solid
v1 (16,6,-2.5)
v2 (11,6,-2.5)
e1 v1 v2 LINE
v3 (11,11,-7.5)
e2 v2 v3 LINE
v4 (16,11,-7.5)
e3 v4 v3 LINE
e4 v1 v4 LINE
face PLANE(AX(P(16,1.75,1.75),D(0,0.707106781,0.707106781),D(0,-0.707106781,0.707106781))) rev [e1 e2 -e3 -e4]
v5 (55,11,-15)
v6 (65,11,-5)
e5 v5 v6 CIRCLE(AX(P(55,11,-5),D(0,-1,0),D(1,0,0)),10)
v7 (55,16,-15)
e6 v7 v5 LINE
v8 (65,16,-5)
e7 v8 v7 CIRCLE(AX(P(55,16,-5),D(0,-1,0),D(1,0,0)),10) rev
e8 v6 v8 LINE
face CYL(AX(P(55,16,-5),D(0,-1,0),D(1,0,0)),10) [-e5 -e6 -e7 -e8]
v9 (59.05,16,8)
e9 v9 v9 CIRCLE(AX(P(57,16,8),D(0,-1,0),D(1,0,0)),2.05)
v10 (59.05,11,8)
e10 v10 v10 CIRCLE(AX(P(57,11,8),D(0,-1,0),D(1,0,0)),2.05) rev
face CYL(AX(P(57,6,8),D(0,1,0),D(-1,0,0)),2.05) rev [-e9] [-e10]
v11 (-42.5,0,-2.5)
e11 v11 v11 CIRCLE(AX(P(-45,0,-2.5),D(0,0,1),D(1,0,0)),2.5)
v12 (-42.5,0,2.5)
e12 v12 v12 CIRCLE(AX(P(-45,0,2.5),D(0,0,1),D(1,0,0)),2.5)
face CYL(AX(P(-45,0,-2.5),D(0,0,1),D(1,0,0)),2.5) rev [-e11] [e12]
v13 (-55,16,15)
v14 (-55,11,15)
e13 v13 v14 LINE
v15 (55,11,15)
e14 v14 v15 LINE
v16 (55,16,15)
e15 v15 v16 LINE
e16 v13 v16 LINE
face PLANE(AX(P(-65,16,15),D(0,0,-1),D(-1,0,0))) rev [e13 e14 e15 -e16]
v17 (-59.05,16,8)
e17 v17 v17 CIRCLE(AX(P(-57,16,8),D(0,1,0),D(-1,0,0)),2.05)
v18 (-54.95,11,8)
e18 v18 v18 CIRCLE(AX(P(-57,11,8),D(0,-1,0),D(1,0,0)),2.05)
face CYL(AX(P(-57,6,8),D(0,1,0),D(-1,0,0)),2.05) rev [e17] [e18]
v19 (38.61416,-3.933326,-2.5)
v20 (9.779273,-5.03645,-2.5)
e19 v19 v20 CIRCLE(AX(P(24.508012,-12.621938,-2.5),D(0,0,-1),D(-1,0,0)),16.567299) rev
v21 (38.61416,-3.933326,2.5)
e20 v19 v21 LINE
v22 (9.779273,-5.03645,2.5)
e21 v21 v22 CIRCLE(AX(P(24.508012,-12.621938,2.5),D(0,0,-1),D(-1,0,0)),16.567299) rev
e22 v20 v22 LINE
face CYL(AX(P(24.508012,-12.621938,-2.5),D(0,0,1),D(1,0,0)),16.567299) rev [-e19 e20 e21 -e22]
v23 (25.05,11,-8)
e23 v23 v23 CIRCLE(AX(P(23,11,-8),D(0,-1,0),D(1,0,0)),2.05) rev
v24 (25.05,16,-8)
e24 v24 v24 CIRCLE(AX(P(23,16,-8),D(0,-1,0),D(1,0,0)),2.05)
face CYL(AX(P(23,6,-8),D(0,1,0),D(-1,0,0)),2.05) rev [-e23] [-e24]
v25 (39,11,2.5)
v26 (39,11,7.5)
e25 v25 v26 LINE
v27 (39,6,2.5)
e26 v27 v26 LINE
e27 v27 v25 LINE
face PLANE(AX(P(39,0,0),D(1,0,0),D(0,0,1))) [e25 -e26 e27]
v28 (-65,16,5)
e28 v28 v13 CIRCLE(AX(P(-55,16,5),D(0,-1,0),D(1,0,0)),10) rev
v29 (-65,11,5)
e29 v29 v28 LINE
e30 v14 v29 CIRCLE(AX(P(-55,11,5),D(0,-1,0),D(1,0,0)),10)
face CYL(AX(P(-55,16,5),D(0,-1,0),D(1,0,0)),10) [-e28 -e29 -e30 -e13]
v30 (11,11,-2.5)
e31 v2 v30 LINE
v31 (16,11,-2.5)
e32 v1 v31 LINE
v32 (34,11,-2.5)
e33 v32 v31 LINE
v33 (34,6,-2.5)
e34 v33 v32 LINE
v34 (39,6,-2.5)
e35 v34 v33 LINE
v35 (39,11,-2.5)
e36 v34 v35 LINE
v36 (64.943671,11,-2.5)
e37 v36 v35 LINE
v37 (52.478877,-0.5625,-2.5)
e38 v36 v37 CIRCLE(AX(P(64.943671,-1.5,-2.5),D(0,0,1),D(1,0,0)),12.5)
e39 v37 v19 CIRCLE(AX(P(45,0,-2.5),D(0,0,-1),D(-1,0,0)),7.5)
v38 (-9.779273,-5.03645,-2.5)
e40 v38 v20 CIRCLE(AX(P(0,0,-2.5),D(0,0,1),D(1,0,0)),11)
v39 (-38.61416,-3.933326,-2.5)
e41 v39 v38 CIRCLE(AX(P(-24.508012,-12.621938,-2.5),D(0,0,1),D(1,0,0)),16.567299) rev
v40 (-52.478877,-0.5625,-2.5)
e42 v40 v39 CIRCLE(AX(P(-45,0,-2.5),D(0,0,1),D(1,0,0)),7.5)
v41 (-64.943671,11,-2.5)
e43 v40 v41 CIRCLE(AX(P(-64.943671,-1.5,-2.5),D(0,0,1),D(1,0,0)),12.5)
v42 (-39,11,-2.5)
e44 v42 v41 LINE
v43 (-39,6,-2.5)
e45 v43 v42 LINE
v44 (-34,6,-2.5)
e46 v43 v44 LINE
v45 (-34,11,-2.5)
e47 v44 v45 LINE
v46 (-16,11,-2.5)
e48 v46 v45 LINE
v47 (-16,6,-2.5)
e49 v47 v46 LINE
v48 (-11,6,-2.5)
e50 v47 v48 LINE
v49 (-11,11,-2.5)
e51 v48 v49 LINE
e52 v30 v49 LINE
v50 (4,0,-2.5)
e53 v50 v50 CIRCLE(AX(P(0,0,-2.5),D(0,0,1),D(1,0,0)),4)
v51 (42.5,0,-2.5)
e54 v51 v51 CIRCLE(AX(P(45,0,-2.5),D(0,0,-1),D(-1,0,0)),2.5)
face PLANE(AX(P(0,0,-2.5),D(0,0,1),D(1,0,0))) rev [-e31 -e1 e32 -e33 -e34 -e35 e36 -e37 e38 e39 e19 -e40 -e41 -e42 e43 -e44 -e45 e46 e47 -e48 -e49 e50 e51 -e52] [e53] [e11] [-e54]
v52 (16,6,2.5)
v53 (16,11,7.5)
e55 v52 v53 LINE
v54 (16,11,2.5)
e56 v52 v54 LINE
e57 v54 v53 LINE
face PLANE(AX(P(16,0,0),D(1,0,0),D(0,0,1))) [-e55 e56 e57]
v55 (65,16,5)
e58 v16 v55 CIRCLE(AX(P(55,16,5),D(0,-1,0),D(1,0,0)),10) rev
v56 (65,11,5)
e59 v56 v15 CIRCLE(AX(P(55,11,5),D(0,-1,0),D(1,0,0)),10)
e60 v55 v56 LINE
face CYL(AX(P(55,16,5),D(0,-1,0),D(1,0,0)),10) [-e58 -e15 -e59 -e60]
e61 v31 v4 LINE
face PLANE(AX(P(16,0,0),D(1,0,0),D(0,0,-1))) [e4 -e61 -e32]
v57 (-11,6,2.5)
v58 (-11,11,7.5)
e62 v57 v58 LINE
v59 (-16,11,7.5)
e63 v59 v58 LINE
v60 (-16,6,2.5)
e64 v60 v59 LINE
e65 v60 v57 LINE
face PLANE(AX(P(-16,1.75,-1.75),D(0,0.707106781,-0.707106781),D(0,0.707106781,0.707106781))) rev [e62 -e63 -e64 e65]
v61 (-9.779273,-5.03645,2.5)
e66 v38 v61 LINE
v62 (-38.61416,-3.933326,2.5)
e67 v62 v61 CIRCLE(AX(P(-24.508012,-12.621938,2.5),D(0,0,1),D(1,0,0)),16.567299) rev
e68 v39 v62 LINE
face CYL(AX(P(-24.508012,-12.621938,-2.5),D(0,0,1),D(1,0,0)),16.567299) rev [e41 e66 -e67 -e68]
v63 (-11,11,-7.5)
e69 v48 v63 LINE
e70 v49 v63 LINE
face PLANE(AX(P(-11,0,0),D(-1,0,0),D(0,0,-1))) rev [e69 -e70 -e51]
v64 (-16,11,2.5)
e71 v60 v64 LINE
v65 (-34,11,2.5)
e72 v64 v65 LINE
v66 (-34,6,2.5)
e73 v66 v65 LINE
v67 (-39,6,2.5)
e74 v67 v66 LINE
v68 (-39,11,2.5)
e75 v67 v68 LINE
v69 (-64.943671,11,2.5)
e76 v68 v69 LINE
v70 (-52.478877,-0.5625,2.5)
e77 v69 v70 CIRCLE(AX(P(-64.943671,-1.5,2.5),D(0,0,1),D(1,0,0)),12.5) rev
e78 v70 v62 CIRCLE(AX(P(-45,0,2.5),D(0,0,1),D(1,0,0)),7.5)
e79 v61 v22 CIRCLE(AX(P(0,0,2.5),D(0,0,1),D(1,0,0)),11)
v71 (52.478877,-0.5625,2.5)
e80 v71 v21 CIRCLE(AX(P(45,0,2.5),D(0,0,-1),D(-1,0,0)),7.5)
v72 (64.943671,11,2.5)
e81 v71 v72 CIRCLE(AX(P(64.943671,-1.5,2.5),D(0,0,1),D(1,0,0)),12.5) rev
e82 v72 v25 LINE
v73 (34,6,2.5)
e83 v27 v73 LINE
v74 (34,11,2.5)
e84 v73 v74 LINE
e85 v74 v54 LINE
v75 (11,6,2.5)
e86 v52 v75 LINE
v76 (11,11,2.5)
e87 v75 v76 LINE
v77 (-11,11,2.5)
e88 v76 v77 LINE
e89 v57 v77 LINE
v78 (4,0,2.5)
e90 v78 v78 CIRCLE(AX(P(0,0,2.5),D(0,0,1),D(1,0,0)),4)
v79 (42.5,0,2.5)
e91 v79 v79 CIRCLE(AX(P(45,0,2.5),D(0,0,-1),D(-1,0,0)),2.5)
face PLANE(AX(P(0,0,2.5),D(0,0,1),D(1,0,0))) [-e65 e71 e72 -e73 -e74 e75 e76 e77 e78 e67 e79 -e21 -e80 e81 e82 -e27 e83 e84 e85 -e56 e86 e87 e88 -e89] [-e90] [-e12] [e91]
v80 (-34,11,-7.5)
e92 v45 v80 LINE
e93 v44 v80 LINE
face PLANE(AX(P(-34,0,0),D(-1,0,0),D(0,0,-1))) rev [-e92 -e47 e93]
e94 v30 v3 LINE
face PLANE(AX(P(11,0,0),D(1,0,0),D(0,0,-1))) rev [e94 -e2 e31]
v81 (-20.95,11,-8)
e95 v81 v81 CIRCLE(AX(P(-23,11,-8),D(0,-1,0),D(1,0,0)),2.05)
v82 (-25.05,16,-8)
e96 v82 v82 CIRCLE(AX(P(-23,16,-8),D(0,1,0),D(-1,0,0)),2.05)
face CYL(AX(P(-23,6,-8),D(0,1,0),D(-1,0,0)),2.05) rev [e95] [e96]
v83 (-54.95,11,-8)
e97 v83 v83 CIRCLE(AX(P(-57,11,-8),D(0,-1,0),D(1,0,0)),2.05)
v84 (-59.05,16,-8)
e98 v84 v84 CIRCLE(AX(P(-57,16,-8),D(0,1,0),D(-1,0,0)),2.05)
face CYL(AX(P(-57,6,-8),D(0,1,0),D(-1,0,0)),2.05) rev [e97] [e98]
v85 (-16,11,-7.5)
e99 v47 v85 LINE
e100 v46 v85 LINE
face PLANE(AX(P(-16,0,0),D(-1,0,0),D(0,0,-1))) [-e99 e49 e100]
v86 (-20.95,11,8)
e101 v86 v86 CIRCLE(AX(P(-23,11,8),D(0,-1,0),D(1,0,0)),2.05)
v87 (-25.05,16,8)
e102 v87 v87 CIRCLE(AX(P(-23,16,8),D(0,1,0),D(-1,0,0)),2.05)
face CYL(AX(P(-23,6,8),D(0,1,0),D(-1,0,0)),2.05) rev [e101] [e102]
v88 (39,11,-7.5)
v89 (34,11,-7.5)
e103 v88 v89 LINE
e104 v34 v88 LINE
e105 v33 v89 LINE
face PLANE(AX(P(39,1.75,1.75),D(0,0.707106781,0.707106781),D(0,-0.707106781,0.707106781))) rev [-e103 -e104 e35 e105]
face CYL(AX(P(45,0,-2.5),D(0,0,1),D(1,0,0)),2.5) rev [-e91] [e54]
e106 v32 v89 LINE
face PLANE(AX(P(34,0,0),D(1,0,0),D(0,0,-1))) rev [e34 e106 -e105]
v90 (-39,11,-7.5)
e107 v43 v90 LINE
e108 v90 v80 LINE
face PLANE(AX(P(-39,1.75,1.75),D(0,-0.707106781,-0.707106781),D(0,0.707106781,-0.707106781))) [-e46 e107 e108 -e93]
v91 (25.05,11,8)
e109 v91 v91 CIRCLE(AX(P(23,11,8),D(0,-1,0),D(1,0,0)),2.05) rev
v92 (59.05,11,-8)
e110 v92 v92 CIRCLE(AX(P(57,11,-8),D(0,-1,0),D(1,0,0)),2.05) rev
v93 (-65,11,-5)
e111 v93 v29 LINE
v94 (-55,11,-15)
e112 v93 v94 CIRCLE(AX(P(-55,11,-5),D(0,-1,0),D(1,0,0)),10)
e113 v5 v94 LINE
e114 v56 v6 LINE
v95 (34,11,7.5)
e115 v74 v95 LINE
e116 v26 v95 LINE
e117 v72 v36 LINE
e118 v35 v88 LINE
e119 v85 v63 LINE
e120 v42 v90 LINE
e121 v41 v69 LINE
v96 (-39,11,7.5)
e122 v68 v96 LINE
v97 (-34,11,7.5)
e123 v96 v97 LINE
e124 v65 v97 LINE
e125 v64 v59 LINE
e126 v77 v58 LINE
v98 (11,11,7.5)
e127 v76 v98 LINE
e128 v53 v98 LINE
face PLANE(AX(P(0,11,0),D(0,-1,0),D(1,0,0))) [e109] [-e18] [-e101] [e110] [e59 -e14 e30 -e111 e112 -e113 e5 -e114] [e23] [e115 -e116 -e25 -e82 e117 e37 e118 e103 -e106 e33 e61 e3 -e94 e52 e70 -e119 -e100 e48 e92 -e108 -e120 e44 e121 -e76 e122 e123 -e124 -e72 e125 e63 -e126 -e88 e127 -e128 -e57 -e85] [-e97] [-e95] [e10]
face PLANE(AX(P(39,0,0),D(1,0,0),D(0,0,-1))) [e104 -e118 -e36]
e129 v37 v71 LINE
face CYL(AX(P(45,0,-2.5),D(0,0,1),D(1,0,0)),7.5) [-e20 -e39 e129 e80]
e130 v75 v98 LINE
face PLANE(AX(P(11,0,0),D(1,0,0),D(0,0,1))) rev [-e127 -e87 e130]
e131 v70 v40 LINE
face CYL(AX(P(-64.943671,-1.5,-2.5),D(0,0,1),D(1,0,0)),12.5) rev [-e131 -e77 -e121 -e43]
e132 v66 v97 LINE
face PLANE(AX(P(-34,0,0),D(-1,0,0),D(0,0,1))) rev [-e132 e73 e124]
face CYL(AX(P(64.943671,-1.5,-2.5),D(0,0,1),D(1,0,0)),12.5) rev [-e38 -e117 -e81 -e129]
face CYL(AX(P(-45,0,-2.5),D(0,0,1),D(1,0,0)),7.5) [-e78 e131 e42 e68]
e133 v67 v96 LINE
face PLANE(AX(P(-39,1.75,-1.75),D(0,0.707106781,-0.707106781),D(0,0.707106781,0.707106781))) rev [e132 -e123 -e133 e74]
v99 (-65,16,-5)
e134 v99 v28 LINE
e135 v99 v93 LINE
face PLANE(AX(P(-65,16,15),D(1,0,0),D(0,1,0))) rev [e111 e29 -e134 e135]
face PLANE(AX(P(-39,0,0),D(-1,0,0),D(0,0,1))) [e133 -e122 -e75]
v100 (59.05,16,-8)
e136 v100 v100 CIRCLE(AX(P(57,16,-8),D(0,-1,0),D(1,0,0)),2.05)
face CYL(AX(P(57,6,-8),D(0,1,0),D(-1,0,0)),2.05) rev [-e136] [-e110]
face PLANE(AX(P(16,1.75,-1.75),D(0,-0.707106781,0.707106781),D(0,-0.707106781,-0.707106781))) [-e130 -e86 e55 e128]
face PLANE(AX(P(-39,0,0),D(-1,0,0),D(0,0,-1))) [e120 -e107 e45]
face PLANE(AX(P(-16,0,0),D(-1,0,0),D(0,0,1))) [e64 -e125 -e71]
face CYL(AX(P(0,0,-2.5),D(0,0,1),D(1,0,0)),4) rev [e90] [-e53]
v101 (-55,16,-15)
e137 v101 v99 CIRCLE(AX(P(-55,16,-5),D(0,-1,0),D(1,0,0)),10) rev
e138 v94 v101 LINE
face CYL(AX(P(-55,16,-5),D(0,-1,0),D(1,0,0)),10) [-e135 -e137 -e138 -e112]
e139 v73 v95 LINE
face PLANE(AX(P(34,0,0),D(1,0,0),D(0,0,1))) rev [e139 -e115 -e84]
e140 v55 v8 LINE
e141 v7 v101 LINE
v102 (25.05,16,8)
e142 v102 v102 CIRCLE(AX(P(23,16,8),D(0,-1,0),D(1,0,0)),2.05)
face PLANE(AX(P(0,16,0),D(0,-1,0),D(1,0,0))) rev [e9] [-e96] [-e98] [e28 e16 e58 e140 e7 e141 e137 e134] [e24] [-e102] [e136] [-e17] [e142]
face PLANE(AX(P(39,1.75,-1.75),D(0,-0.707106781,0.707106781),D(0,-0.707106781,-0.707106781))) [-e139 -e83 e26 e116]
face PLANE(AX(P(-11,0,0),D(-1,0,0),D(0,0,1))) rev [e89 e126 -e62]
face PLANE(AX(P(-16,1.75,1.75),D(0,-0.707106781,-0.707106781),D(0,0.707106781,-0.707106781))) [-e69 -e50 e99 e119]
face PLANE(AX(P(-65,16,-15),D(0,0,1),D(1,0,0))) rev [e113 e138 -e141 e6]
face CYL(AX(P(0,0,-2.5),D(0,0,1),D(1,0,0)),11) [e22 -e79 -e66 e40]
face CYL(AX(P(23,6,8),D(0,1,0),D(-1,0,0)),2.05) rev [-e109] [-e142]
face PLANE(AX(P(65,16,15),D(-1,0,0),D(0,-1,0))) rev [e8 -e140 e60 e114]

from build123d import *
from build123d.topology import SkipClean

# Parameters (mm, degrees)
SKETCH1_R                                = 2.5
BOSS_EXTRUDE1_DEPTH                      = 2.5
SKETCH4_W                                = 130
SKETCH4_H                                = 30
BOSS_EXTRUDE2_DEPTH                      = 5
FILLET1_R                                = 10
FILLET2_R                                = 12.5
SKETCH5_R                                = 2.05
CUT_EXTRUDE1_DEPTH                       = 10
BOSS_EXTRUDE3_DEPTH                      = 2.5
LPATTERN1_COUNT                          = 2
LPATTERN1_PITCH                          = 23
MIRROR4_COPY_1_DEPTH                     = 2.5
MIRROR4_AT_THE_SECOND_PLANE_COPY_1_DEPTH = 2.5
MIRROR4_AT_THE_SECOND_PLANE_COPY_2_DEPTH = 2.5
MIRROR4_AT_THE_SECOND_PLANE_COPY_3_DEPTH = 2.5


with BuildPart() as part:
    # Sketch1 → Boss-Extrude1 (new, symmetric)
    with BuildSketch(Plane.XY):
        with BuildLine():
            ThreePointArc((-38.614160498, -3.933326056), (-23.874667518, 3.933250754), (-9.779272654, -5.036449778))
            ThreePointArc((-9.779272654, -5.036449778), (-5.727087063, -9.391510729), (0, -11))
            Line((0, -11), (0, -4))
            ThreePointArc((0, -4), (-4, 0), (0, 4))
            Line((0, 4), (0, 11))
            Line((0, 11), (-52.5, 11))
            Line((-52.5, 11), (-52.5, 0))
            ThreePointArc((-52.5, 0), (-47.044040574, -7.216086067), (-38.614160498, -3.933326056))
        make_face()
        with Locations((-45, 0)):
            Circle(SKETCH1_R, mode=Mode.SUBTRACT)
    boss_extrude1 = extrude(amount=BOSS_EXTRUDE1_DEPTH, both=True)

    # Mirror1: Boss-Extrude1 across plane
    with SkipClean():  # the faces are left unmerged after this step: merging them gives an invalid solid
        add(boss_extrude1.mirror(Plane(origin=(0, 0, -2.5), x_dir=(0, 0, 1), z_dir=(-1, 0, 0))))

    # Sketch4 → Boss-Extrude2 (add)
    with SkipClean():  # the faces are left unmerged after this step: merging them gives an invalid solid
        with BuildSketch(Plane(origin=(0, 11, 0), x_dir=(1, 0, 0), z_dir=(0, 1, 0))):
            Rectangle(SKETCH4_W, SKETCH4_H)
        extrude(amount=BOSS_EXTRUDE2_DEPTH)

    # Fillet1
    fillet1_edges = [part.edges().sort_by_distance(p)[0] for p in [
        (-65, 13.5, -15),
        (-65, 13.5, 15),
        (65, 13.5, 15),
        (65, 13.5, -15),
    ]]
    fillet(fillet1_edges, radius=FILLET1_R)

    # Fillet2
    # the kernel refuses this fillet: 12.5 mm, written as the material it adds along each edge
    with BuildSketch(Plane(origin=(-52.5, 11, -2.5), x_dir=(-1, 0, 0), z_dir=(0, 0, 1))) as fillet2_piece_1:
        with BuildLine():
            CenterArc((12.443670675, 12.5), FILLET2_R, 184.301222305, 85.698777695)
            Line((-0.021123497, 11.5625), (-1.267602914, 11.46875))
            ThreePointArc((-1.267602914, 11.46875), (-1.25, 11), (-1.25, 0))
            Line((-1.25, 0), (0, -1.25))
            Line((0, -1.25), (12.443670675, -1.25))
            Line((12.443670675, -1.25), (12.443670675, 0))
        make_face()
    extrude(amount=5)
    with BuildSketch(Plane(origin=(52.5, 11, -2.5), x_dir=(1, 0, 0), z_dir=(0, 0, 1))) as fillet2_piece_2:
        with BuildLine():
            CenterArc((12.443670675, -12.5), FILLET2_R, 90, 85.698777695)
            Line((-0.021123497, -11.5625), (-1.267602914, -11.46875))
            ThreePointArc((-1.267602914, -11.46875), (-1.25, -11), (-1.25, 0))
            Line((-1.25, 0), (0, 1.25))
            Line((0, 1.25), (12.443670675, 1.25))
            Line((12.443670675, 1.25), (12.443670675, 0))
        make_face()
    extrude(amount=5)

    # Sketch5 → Cut-Extrude1 (cut)
    with BuildSketch(Plane(origin=(0, 16, 0), x_dir=(1, 0, 0), z_dir=(0, 1, 0))):
        with Locations(Location((-57, -8, 0), (0, 0, 180))):
            Circle(SKETCH5_R)
        with Locations(Location((-57, 8, 0), (0, 0, 180))):
            Circle(SKETCH5_R)
        with Locations(Location((-23, -8, 0), (0, 0, 180))):
            Circle(SKETCH5_R)
        with Locations(Location((-23, 8, 0), (0, 0, 180))):
            Circle(SKETCH5_R)
    cut_extrude1 = extrude(amount=-CUT_EXTRUDE1_DEPTH, mode=Mode.SUBTRACT)

    # Mirror2: Cut-Extrude1 across plane
    add(cut_extrude1.mirror(Plane(origin=(0, 0, 0), x_dir=(0, 0, 1), z_dir=(1, 0, 0))), mode=Mode.SUBTRACT)

    # Sketch7 → Boss-Extrude3 (add, symmetric)
    with BuildSketch(Plane(origin=(36.5, 0, 0), x_dir=(0, 0, -1), z_dir=(1, 0, 0))):
        Polygon((5, 11), (2.5, 11), (2.5, 6), (7.5, 11), align=None)
    boss_extrude3 = extrude(amount=BOSS_EXTRUDE3_DEPTH, both=True)

    # LPattern1: Boss-Extrude3 ×2
    with Locations(*[(-i * LPATTERN1_PITCH, 0, 0) for i in range(1, LPATTERN1_COUNT)]):
        add(boss_extrude3)

    # Mirror4: Boss-Extrude3 across plane
    add(boss_extrude3.mirror(Plane.XY))

    # Mirror4 copy 1 sketch → Mirror4 copy 1 (add, symmetric)
    with BuildSketch(Plane(origin=(13.5, 0, 0), x_dir=(0, 0, 1), z_dir=(1, 0, 0))):
        Polygon((5, -11), (2.5, -11), (2.5, -6), (7.5, -11), align=None)
    extrude(amount=MIRROR4_COPY_1_DEPTH, both=True)

    # Mirror4 at the second plane: Boss-Extrude3 across plane
    add(boss_extrude3.mirror(Plane(origin=(0, 0, 0), x_dir=(0, 0, 1), z_dir=(1, 0, 0))))

    # Mirror4 at the second plane copy 1 sketc → Mirror4 at the second plane copy 1 (add, symmetric)
    with BuildSketch(Plane(origin=(-13.5, 0, 0), x_dir=(0, 0, -1), z_dir=(-1, 0, 0))):
        Polygon((5, -11), (2.5, -11), (2.5, -6), (7.5, -11), align=None)
    extrude(amount=MIRROR4_AT_THE_SECOND_PLANE_COPY_1_DEPTH, both=True)

    # Mirror4 at the second plane copy 2 sketc → Mirror4 at the second plane copy 2 (add, symmetric)
    with BuildSketch(Plane.ZY.offset(36.5)):
        Polygon((5, 11), (2.5, 11), (2.5, 6), (7.5, 11), align=None)
    extrude(amount=MIRROR4_AT_THE_SECOND_PLANE_COPY_2_DEPTH, both=True)

    # Mirror4 at the second plane copy 3 sketc → Mirror4 at the second plane copy 3 (add, symmetric)
    with BuildSketch(Plane.ZY.offset(13.5)):
        Polygon((5, 11), (2.5, 11), (2.5, 6), (7.5, 11), align=None)
    extrude(amount=MIRROR4_AT_THE_SECOND_PLANE_COPY_3_DEPTH, both=True)


solid = part.part
